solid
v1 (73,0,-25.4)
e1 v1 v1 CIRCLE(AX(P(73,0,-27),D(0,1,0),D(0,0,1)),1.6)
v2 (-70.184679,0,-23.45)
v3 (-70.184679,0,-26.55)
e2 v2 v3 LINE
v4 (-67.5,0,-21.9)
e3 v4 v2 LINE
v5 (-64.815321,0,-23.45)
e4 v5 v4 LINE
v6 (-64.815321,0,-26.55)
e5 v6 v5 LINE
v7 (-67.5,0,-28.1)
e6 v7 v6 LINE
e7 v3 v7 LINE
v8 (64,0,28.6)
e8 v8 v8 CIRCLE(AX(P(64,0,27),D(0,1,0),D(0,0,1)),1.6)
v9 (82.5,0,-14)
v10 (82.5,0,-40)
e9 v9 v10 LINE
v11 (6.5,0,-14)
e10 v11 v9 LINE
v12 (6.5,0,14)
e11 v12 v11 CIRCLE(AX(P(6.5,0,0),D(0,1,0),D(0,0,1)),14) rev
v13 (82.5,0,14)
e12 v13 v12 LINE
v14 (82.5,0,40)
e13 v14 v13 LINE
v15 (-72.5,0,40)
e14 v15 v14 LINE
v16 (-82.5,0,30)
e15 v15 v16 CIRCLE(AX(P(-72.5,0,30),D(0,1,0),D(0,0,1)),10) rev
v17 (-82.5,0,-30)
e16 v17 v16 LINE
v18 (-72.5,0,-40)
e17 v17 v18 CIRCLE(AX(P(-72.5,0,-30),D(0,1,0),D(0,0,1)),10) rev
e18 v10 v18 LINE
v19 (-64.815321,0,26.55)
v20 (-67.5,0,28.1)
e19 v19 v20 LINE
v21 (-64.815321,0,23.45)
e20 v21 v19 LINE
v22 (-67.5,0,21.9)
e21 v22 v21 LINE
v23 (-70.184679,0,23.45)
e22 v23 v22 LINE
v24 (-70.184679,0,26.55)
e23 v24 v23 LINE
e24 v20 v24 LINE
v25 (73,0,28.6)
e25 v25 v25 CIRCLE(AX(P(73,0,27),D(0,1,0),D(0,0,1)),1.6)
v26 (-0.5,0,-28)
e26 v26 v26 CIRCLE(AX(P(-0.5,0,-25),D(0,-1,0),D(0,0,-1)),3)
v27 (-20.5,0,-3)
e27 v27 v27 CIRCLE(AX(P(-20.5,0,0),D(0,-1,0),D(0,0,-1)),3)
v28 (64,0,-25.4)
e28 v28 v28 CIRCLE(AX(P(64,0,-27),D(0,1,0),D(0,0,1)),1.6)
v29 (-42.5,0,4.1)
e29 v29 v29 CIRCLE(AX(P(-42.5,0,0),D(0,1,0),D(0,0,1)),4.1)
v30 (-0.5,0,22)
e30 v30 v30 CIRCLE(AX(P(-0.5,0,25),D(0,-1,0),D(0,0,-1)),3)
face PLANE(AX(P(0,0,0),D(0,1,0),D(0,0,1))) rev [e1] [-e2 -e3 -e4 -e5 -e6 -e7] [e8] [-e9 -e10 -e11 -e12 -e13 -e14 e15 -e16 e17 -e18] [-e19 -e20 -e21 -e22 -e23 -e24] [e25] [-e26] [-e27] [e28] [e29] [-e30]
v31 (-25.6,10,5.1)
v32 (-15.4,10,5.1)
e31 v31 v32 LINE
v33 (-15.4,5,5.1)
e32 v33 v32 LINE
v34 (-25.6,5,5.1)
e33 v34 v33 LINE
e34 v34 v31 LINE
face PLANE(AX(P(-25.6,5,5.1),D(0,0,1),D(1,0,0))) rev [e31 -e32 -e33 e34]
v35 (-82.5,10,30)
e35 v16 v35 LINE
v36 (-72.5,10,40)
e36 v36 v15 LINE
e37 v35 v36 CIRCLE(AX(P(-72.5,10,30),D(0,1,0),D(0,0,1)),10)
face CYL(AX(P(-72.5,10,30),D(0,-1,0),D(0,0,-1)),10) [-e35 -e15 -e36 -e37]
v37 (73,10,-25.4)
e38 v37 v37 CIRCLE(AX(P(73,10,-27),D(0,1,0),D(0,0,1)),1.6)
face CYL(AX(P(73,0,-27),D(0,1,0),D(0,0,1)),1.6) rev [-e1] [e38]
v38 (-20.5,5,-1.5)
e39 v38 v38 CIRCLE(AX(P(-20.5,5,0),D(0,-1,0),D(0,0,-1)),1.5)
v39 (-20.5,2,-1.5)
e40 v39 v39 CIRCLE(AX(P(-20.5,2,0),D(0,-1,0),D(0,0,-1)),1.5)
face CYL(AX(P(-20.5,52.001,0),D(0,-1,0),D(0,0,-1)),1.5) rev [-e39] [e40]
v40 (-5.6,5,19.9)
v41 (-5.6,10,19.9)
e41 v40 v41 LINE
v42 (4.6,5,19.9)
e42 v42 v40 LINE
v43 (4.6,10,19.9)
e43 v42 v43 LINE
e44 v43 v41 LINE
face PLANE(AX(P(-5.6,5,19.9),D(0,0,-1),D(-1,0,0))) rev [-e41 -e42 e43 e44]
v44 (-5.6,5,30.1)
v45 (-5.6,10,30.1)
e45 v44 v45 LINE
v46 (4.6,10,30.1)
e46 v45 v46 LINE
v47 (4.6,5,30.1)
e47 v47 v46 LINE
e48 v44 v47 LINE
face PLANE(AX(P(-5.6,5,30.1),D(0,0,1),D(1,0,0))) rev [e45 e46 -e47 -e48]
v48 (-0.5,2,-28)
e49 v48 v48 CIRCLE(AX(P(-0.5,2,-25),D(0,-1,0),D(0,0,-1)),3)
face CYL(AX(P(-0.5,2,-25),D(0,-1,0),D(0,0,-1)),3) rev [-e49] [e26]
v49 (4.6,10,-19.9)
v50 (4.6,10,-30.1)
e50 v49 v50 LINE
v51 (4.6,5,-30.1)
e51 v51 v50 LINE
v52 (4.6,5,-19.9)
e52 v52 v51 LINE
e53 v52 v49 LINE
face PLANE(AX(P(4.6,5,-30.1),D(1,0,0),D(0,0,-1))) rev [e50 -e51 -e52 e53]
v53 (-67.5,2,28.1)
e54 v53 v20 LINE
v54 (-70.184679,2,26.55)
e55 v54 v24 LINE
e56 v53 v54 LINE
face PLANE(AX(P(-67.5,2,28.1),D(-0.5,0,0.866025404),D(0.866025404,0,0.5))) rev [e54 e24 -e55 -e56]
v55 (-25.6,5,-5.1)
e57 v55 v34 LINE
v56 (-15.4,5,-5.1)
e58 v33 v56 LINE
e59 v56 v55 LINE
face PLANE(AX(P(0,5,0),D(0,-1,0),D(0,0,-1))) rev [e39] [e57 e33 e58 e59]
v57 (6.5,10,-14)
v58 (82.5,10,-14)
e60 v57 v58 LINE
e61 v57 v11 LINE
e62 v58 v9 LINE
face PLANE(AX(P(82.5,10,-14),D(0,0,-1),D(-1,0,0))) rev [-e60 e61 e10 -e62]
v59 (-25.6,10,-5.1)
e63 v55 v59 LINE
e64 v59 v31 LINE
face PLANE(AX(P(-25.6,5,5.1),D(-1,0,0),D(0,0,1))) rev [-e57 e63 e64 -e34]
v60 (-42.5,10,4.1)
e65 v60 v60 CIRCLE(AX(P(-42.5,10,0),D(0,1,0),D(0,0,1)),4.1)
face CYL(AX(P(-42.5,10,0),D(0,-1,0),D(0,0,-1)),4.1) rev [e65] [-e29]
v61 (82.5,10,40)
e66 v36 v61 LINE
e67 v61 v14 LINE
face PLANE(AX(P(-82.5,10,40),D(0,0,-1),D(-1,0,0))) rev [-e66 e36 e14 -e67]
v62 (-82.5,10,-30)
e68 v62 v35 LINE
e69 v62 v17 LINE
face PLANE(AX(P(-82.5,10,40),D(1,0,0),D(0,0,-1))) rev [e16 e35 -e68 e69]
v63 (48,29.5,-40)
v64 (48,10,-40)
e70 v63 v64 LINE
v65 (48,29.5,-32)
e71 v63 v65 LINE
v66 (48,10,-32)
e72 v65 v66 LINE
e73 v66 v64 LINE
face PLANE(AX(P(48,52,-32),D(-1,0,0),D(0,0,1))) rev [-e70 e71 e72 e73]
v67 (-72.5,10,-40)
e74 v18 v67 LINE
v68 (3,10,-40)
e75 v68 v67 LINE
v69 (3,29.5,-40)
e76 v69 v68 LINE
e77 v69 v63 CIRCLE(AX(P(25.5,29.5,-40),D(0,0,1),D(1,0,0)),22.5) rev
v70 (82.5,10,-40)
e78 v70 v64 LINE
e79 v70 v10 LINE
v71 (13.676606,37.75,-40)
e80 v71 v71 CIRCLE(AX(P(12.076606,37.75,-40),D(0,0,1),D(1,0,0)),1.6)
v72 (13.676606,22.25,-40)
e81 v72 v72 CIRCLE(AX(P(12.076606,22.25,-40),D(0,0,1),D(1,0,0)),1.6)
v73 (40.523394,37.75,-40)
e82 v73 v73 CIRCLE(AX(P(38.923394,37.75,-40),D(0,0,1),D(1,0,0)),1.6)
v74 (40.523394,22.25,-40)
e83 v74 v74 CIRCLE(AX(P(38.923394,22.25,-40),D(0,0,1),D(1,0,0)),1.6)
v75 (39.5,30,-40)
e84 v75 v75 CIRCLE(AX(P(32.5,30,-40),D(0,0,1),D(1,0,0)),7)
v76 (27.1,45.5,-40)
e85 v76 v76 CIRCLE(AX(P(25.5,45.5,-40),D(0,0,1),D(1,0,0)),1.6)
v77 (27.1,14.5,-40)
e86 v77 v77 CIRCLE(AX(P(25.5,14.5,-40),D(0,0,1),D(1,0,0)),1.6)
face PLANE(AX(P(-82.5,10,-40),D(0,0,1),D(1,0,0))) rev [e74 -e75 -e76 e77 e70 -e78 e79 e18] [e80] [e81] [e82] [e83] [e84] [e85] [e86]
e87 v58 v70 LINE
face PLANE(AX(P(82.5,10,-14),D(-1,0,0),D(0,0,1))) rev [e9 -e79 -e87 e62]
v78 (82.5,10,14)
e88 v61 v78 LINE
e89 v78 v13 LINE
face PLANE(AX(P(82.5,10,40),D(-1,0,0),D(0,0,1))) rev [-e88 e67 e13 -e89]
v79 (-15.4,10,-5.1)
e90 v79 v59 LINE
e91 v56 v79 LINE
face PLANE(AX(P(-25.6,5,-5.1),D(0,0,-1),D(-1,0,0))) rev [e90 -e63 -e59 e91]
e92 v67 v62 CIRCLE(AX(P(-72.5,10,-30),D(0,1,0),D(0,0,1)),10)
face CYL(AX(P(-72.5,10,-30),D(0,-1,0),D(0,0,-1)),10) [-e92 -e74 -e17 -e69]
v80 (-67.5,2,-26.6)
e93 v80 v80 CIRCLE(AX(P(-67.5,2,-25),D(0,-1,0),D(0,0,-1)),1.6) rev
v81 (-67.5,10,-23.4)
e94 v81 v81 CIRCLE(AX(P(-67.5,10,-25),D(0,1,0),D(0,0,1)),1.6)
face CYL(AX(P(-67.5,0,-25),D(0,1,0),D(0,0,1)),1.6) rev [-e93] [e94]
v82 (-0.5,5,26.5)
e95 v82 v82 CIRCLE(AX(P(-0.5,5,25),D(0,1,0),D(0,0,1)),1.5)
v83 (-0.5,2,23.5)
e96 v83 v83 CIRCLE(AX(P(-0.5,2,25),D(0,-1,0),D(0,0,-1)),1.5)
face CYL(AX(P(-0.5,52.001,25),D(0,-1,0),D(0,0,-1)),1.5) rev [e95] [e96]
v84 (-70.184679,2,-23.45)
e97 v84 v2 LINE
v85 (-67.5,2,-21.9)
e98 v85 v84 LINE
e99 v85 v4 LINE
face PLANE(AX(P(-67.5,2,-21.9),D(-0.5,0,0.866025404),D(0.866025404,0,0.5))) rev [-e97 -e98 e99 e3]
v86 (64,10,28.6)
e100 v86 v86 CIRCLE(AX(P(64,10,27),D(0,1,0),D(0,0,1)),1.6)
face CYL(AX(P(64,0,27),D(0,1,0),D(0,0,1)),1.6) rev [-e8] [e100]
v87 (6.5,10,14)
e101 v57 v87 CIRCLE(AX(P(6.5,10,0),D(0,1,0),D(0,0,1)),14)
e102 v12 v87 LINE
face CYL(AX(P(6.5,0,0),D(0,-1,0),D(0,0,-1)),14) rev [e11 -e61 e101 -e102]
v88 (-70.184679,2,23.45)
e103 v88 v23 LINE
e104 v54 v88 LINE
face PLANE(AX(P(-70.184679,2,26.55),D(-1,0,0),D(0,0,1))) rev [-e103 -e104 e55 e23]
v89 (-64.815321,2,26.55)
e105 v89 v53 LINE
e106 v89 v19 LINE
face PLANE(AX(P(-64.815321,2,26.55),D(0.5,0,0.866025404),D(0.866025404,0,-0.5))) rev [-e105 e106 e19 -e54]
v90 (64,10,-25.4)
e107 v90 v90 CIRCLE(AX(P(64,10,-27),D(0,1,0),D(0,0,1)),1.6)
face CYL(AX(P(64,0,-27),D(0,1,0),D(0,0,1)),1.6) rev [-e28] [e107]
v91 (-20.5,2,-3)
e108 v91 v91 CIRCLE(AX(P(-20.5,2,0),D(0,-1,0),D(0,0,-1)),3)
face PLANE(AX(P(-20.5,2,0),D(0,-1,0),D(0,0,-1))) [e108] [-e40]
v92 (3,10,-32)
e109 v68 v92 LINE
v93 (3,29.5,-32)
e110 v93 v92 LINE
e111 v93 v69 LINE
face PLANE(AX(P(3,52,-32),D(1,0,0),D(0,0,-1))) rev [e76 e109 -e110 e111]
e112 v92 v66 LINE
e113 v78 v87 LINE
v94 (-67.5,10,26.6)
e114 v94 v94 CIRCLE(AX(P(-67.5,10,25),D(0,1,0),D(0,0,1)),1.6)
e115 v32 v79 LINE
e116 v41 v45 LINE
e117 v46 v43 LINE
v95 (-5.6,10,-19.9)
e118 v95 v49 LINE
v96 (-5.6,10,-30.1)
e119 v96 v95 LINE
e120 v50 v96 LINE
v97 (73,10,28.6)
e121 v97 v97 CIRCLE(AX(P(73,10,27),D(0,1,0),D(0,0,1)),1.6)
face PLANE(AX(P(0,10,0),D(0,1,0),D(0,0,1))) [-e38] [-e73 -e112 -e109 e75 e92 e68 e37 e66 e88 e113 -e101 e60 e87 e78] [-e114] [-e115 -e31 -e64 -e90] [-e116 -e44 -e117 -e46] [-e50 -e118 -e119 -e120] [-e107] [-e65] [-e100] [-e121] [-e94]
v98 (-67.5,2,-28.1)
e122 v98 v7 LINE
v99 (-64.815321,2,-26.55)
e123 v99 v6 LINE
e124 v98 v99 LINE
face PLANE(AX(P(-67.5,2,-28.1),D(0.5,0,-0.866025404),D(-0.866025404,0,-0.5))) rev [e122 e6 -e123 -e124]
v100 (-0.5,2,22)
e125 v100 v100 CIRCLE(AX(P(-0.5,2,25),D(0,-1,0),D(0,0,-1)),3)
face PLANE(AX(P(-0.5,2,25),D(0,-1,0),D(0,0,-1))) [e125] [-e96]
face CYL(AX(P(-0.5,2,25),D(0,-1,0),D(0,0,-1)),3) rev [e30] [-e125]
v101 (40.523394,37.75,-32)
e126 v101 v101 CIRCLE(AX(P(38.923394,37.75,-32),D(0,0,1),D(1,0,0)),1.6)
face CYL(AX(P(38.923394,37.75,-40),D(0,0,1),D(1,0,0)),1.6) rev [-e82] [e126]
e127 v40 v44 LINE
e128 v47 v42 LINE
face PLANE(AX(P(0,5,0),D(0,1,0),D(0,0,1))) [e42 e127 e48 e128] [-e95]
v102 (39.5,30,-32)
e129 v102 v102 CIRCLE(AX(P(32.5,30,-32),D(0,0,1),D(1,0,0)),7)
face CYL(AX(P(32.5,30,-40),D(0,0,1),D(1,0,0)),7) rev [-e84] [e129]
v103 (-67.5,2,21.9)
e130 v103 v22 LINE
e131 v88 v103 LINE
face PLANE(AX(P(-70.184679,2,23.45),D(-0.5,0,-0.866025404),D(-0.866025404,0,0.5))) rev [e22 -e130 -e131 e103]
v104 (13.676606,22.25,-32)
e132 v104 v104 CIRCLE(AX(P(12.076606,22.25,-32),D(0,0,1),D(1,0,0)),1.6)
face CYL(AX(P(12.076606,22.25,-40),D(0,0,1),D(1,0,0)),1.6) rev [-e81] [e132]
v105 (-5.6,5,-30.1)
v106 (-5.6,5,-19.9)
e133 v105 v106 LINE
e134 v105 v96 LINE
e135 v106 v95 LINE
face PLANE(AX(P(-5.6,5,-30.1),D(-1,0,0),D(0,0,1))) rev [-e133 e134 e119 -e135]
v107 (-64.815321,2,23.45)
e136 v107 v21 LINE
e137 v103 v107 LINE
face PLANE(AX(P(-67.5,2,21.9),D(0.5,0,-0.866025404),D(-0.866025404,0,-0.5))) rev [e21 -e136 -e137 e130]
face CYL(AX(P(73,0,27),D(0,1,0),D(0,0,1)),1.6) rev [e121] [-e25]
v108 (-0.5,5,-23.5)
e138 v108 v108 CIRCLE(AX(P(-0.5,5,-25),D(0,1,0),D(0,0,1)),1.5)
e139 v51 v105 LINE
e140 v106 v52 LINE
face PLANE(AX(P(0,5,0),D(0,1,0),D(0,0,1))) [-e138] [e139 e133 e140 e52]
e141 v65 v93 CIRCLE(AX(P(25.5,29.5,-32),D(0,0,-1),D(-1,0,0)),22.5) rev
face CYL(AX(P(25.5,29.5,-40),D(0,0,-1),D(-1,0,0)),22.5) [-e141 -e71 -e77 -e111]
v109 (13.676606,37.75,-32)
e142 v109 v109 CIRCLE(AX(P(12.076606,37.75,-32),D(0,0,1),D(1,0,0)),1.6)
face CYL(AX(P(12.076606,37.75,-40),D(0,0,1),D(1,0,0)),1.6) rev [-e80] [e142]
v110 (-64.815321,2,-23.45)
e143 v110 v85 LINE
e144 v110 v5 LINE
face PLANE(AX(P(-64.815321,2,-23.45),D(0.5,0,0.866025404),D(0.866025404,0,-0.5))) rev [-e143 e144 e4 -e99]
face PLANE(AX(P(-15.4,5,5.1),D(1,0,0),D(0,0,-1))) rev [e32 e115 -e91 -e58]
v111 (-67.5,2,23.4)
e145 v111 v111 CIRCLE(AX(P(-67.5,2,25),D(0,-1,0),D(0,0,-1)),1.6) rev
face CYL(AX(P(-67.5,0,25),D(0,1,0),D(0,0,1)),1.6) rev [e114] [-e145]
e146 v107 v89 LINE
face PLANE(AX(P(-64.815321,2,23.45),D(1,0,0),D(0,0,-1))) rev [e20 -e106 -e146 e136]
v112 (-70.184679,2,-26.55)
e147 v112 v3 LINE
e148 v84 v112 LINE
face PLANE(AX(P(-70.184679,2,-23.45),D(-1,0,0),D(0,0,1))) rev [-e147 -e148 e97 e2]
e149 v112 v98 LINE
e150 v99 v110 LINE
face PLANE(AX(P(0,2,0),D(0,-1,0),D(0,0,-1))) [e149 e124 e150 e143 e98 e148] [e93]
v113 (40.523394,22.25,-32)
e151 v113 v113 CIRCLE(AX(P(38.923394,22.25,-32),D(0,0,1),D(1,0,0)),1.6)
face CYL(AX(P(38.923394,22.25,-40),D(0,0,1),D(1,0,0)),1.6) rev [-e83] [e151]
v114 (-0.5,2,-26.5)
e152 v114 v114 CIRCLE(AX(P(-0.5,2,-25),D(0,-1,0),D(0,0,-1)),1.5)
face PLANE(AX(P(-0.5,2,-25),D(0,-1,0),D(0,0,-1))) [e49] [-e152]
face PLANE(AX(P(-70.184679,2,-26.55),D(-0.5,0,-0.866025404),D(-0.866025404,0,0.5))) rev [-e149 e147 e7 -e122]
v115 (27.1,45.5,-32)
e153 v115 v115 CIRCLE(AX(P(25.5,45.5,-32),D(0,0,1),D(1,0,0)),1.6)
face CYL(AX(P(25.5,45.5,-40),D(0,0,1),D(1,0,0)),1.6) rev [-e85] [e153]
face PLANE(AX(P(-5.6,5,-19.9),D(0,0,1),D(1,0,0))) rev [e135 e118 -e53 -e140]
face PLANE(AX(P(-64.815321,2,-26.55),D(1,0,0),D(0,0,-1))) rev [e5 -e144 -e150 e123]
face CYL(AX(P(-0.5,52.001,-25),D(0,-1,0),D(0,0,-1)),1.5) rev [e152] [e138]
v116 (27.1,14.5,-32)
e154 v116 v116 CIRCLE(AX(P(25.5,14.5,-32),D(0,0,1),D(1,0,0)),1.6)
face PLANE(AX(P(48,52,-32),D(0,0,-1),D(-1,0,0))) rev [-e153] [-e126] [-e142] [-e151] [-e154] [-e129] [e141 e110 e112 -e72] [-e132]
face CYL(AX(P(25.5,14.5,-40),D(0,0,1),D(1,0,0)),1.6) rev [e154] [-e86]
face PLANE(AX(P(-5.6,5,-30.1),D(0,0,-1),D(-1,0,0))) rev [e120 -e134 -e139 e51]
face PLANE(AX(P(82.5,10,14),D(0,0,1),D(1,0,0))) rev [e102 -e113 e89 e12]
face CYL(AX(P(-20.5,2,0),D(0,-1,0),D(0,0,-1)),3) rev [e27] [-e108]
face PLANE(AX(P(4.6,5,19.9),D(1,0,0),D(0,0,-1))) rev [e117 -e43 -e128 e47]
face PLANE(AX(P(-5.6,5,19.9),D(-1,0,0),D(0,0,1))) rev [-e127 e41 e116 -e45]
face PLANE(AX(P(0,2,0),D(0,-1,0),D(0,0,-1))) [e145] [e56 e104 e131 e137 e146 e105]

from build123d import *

# Parameters (mm, degrees)
SKETCH_1_R          = 4.1
EXTRUDE_1_DEPTH     = 10
FILLET_1_R          = 10
FILLET_2_R          = 14
SKETCH_5_W          = 45
SKETCH_5_H          = 8
EXTRUDE_4_DEPTH     = 42
FILLET_3_RADIUS     = 22.5
FILLET_3_LENGTH     = 8
SKETCH_6_R          = 7
SKETCH_6_R_2        = 1.6
CUT_EXTRUDE_1_DEPTH = 122.21984161
SKETCH_7_W          = 10.2
SKETCH_7_H          = 10.2
CUT_EXTRUDE_2_DEPTH = 5
SKETCH_8_R          = 1.6
CUT_EXTRUDE_3_DEPTH = 101.847657385
SKETCH_2_R          = 1.6
CUT_EXTRUDE_5_DEPTH = 101.847657385
CUT_EXTRUDE_6_REACH = 107.405
SKETCH_9_R          = 1.5
SKETCH_10_R         = 3
CUT_EXTRUDE_7_DEPTH = 2


with BuildPart() as part:
    # ｽｹｯﾁ1 → ﾎﾞｽ - 押し出し1 (new body)
    with BuildSketch(Plane(origin=(0, 0, 0), x_dir=(1, 0, 0), z_dir=(0, 1, 0))):
        Polygon((82.5, 14), (82.5, 40), (-82.5, 40), (-82.5, -40), (82.5, -40), (82.5, -14), (-7.5, -14), (-7.5, 14), align=None)
        with Locations(Location((-42.5, 0, 0), (0, 0, 270))):
            Circle(SKETCH_1_R, mode=Mode.SUBTRACT)
    extrude(amount=EXTRUDE_1_DEPTH)

    # ﾌｨﾚｯﾄ1
    fillet_1_edges = [part.edges().sort_by_distance(p)[0] for p in [
        (-82.5, 5, 40),
        (-82.5, 5, -40),
    ]]
    fillet(fillet_1_edges, radius=FILLET_1_R)

    # ﾌｨﾚｯﾄ2
    fillet_2_edges = [part.edges().sort_by_distance(p)[0] for p in [
        (-7.5, 5, -14),
        (-7.5, 5, 14),
    ]]
    fillet(fillet_2_edges, radius=FILLET_2_R - 0.0001)  # a hair under: the kernel refuses the full size

    # ｽｹｯﾁ5 → ﾎﾞｽ - 押し出し4 (add)
    with BuildSketch(Plane(origin=(0, 10, 0), x_dir=(1, 0, 0), z_dir=(0, 1, 0))):
        with Locations((25.5, 36)):
            Rectangle(SKETCH_5_W, SKETCH_5_H)
    extrude(amount=EXTRUDE_4_DEPTH)

    # ﾌｨﾚｯﾄ3: full round fillet: the end face becomes a half cylinder, R = half its width
    fillet_3_face = Plane((25.5, 52, -36), x_dir=(0, 0, -1), z_dir=(0, 1, 0))  # on the end face: x along it, z out of the body
    fillet_3_slab = fillet_3_face.offset(-FILLET_3_RADIUS / 2) * Box(FILLET_3_LENGTH, 2 * FILLET_3_RADIUS, FILLET_3_RADIUS, mode=Mode.PRIVATE)  # the body's end, R deep
    fillet_3_round = Plane((25.5, 29.5, -36), x_dir=(0, 1, 0), z_dir=(0, 0, -1)) * Cylinder(FILLET_3_RADIUS, FILLET_3_LENGTH, mode=Mode.PRIVATE)  # its axis R under the face
    add(fillet_3_slab - fillet_3_round, mode=Mode.SUBTRACT)

    # ｽｹｯﾁ6 → ｶｯﾄ - 押し出し1 (cut, through all)
    with BuildSketch(Plane.XY.offset(-32)):
        with Locations((32.5, 30)):
            Circle(SKETCH_6_R)
        with Locations((25.5, 45.5)):
            Circle(SKETCH_6_R_2)
        with Locations((38.923393759, 37.75)):
            Circle(SKETCH_6_R_2)
        with Locations((38.923393759, 22.25)):
            Circle(SKETCH_6_R_2)
        with Locations((25.5, 14.5)):
            Circle(SKETCH_6_R_2)
        with Locations((12.076606241, 22.25)):
            Circle(SKETCH_6_R_2)
        with Locations((12.076606241, 37.75)):
            Circle(SKETCH_6_R_2)
    extrude(amount=-CUT_EXTRUDE_1_DEPTH, mode=Mode.SUBTRACT)

    # ｽｹｯﾁ7 → ｶｯﾄ - 押し出し2 (cut)
    with BuildSketch(Plane(origin=(0, 10, 0), x_dir=(1, 0, 0), z_dir=(0, 1, 0))):
        with Locations((-0.5, 25)):
            Rectangle(SKETCH_7_W, SKETCH_7_H)
        with Locations((-0.5, -25)):
            Rectangle(SKETCH_7_W, SKETCH_7_H)
        with Locations((-20.5, 0)):
            Rectangle(SKETCH_7_W, SKETCH_7_H)
    extrude(amount=-CUT_EXTRUDE_2_DEPTH, mode=Mode.SUBTRACT)

    # ｽｹｯﾁ8 → ｶｯﾄ - 押し出し3 (cut, through all)
    with BuildSketch(Plane(origin=(0, 10, 0), x_dir=(1, 0, 0), z_dir=(0, 1, 0))):
        with Locations(Location((73, 27, 0), (0, 0, 270))):
            Circle(SKETCH_8_R)
        with Locations(Location((64, 27, 0), (0, 0, 270))):
            Circle(SKETCH_8_R)
        with Locations(Location((64, -27, 0), (0, 0, 270))):
            Circle(SKETCH_8_R)
        with Locations(Location((73, -27, 0), (0, 0, 270))):
            Circle(SKETCH_8_R)
    extrude(amount=-CUT_EXTRUDE_3_DEPTH, mode=Mode.SUBTRACT)

    # ｽｹｯﾁ2 → ｶｯﾄ - 押し出し5 (cut, through all)
    with BuildSketch(Plane(origin=(0, 10, 0), x_dir=(1, 0, 0), z_dir=(0, 1, 0))):
        with Locations(Location((-67.5, 25, 0), (0, 0, 270))):
            Circle(SKETCH_2_R)
        with Locations(Location((-67.5, -25, 0), (0, 0, 270))):
            Circle(SKETCH_2_R)
    extrude(amount=-CUT_EXTRUDE_5_DEPTH, mode=Mode.SUBTRACT)

    # ｽｹｯﾁ9 → ｶｯﾄ - 押し出し6 (cut, up to next)
    with BuildSketch(Plane(origin=(0, 0, 0), x_dir=(1, 0, 0), z_dir=(0, 1, 0)), mode=Mode.PRIVATE) as cut_extrude_6_sk1:
        with Locations(Location((-0.5, 25, 0), (0, 0, 270))):
            Circle(SKETCH_9_R)
    cut_extrude_6_tool1 = extrude(cut_extrude_6_sk1.sketch, amount=CUT_EXTRUDE_6_REACH, mode=Mode.PRIVATE) & part.part
    # ｽｹｯﾁ9 → ｶｯﾄ - 押し出し6 (cut, up to next)
    with BuildSketch(Plane(origin=(0, 0, 0), x_dir=(1, 0, 0), z_dir=(0, 1, 0)), mode=Mode.PRIVATE) as cut_extrude_6_sk2:
        with Locations(Location((-20.5, 0, 0), (0, 0, 90))):
            Circle(SKETCH_9_R)
    cut_extrude_6_tool2 = extrude(cut_extrude_6_sk2.sketch, amount=CUT_EXTRUDE_6_REACH, mode=Mode.PRIVATE) & part.part
    # ｽｹｯﾁ9 → ｶｯﾄ - 押し出し6 (cut, up to next)
    with BuildSketch(Plane(origin=(0, 0, 0), x_dir=(1, 0, 0), z_dir=(0, 1, 0)), mode=Mode.PRIVATE) as cut_extrude_6_sk3:
        with Locations(Location((-0.5, -25, 0), (0, 0, 270))):
            Circle(SKETCH_9_R)
    cut_extrude_6_tool3 = extrude(cut_extrude_6_sk3.sketch, amount=CUT_EXTRUDE_6_REACH, mode=Mode.PRIVATE) & part.part
    add(cut_extrude_6_tool1.solids().sort_by_distance((-0.5, 0, -25))[0], mode=Mode.SUBTRACT)
    add(cut_extrude_6_tool2.solids().sort_by_distance((-20.5, 0, 0))[0], mode=Mode.SUBTRACT)
    add(cut_extrude_6_tool3.solids().sort_by_distance((-0.5, 0, 25))[0], mode=Mode.SUBTRACT)

    # ｽｹｯﾁ10 → ｶｯﾄ - 押し出し7 (cut)
    with BuildSketch(Plane.XZ):
        with Locations(Location((-0.5, 25, 0), (0, 0, 270))):
            Circle(SKETCH_10_R)
        with Locations(Location((-20.5, 0, 0), (0, 0, 270))):
            Circle(SKETCH_10_R)
        with Locations(Location((-0.5, -25, 0), (0, 0, 270))):
            Circle(SKETCH_10_R)
        Polygon((-67.5, 28.1), (-70.184678752, 26.55), (-70.184678752, 23.45), (-67.5, 21.9), (-64.815321248, 23.45), (-64.815321248, 26.55), align=None)
        Polygon((-67.5, -21.9), (-70.184678752, -23.45), (-70.184678752, -26.55), (-67.5, -28.1), (-64.815321248, -26.55), (-64.815321248, -23.45), align=None)
    extrude(amount=-CUT_EXTRUDE_7_DEPTH, mode=Mode.SUBTRACT)


solid = part.part
